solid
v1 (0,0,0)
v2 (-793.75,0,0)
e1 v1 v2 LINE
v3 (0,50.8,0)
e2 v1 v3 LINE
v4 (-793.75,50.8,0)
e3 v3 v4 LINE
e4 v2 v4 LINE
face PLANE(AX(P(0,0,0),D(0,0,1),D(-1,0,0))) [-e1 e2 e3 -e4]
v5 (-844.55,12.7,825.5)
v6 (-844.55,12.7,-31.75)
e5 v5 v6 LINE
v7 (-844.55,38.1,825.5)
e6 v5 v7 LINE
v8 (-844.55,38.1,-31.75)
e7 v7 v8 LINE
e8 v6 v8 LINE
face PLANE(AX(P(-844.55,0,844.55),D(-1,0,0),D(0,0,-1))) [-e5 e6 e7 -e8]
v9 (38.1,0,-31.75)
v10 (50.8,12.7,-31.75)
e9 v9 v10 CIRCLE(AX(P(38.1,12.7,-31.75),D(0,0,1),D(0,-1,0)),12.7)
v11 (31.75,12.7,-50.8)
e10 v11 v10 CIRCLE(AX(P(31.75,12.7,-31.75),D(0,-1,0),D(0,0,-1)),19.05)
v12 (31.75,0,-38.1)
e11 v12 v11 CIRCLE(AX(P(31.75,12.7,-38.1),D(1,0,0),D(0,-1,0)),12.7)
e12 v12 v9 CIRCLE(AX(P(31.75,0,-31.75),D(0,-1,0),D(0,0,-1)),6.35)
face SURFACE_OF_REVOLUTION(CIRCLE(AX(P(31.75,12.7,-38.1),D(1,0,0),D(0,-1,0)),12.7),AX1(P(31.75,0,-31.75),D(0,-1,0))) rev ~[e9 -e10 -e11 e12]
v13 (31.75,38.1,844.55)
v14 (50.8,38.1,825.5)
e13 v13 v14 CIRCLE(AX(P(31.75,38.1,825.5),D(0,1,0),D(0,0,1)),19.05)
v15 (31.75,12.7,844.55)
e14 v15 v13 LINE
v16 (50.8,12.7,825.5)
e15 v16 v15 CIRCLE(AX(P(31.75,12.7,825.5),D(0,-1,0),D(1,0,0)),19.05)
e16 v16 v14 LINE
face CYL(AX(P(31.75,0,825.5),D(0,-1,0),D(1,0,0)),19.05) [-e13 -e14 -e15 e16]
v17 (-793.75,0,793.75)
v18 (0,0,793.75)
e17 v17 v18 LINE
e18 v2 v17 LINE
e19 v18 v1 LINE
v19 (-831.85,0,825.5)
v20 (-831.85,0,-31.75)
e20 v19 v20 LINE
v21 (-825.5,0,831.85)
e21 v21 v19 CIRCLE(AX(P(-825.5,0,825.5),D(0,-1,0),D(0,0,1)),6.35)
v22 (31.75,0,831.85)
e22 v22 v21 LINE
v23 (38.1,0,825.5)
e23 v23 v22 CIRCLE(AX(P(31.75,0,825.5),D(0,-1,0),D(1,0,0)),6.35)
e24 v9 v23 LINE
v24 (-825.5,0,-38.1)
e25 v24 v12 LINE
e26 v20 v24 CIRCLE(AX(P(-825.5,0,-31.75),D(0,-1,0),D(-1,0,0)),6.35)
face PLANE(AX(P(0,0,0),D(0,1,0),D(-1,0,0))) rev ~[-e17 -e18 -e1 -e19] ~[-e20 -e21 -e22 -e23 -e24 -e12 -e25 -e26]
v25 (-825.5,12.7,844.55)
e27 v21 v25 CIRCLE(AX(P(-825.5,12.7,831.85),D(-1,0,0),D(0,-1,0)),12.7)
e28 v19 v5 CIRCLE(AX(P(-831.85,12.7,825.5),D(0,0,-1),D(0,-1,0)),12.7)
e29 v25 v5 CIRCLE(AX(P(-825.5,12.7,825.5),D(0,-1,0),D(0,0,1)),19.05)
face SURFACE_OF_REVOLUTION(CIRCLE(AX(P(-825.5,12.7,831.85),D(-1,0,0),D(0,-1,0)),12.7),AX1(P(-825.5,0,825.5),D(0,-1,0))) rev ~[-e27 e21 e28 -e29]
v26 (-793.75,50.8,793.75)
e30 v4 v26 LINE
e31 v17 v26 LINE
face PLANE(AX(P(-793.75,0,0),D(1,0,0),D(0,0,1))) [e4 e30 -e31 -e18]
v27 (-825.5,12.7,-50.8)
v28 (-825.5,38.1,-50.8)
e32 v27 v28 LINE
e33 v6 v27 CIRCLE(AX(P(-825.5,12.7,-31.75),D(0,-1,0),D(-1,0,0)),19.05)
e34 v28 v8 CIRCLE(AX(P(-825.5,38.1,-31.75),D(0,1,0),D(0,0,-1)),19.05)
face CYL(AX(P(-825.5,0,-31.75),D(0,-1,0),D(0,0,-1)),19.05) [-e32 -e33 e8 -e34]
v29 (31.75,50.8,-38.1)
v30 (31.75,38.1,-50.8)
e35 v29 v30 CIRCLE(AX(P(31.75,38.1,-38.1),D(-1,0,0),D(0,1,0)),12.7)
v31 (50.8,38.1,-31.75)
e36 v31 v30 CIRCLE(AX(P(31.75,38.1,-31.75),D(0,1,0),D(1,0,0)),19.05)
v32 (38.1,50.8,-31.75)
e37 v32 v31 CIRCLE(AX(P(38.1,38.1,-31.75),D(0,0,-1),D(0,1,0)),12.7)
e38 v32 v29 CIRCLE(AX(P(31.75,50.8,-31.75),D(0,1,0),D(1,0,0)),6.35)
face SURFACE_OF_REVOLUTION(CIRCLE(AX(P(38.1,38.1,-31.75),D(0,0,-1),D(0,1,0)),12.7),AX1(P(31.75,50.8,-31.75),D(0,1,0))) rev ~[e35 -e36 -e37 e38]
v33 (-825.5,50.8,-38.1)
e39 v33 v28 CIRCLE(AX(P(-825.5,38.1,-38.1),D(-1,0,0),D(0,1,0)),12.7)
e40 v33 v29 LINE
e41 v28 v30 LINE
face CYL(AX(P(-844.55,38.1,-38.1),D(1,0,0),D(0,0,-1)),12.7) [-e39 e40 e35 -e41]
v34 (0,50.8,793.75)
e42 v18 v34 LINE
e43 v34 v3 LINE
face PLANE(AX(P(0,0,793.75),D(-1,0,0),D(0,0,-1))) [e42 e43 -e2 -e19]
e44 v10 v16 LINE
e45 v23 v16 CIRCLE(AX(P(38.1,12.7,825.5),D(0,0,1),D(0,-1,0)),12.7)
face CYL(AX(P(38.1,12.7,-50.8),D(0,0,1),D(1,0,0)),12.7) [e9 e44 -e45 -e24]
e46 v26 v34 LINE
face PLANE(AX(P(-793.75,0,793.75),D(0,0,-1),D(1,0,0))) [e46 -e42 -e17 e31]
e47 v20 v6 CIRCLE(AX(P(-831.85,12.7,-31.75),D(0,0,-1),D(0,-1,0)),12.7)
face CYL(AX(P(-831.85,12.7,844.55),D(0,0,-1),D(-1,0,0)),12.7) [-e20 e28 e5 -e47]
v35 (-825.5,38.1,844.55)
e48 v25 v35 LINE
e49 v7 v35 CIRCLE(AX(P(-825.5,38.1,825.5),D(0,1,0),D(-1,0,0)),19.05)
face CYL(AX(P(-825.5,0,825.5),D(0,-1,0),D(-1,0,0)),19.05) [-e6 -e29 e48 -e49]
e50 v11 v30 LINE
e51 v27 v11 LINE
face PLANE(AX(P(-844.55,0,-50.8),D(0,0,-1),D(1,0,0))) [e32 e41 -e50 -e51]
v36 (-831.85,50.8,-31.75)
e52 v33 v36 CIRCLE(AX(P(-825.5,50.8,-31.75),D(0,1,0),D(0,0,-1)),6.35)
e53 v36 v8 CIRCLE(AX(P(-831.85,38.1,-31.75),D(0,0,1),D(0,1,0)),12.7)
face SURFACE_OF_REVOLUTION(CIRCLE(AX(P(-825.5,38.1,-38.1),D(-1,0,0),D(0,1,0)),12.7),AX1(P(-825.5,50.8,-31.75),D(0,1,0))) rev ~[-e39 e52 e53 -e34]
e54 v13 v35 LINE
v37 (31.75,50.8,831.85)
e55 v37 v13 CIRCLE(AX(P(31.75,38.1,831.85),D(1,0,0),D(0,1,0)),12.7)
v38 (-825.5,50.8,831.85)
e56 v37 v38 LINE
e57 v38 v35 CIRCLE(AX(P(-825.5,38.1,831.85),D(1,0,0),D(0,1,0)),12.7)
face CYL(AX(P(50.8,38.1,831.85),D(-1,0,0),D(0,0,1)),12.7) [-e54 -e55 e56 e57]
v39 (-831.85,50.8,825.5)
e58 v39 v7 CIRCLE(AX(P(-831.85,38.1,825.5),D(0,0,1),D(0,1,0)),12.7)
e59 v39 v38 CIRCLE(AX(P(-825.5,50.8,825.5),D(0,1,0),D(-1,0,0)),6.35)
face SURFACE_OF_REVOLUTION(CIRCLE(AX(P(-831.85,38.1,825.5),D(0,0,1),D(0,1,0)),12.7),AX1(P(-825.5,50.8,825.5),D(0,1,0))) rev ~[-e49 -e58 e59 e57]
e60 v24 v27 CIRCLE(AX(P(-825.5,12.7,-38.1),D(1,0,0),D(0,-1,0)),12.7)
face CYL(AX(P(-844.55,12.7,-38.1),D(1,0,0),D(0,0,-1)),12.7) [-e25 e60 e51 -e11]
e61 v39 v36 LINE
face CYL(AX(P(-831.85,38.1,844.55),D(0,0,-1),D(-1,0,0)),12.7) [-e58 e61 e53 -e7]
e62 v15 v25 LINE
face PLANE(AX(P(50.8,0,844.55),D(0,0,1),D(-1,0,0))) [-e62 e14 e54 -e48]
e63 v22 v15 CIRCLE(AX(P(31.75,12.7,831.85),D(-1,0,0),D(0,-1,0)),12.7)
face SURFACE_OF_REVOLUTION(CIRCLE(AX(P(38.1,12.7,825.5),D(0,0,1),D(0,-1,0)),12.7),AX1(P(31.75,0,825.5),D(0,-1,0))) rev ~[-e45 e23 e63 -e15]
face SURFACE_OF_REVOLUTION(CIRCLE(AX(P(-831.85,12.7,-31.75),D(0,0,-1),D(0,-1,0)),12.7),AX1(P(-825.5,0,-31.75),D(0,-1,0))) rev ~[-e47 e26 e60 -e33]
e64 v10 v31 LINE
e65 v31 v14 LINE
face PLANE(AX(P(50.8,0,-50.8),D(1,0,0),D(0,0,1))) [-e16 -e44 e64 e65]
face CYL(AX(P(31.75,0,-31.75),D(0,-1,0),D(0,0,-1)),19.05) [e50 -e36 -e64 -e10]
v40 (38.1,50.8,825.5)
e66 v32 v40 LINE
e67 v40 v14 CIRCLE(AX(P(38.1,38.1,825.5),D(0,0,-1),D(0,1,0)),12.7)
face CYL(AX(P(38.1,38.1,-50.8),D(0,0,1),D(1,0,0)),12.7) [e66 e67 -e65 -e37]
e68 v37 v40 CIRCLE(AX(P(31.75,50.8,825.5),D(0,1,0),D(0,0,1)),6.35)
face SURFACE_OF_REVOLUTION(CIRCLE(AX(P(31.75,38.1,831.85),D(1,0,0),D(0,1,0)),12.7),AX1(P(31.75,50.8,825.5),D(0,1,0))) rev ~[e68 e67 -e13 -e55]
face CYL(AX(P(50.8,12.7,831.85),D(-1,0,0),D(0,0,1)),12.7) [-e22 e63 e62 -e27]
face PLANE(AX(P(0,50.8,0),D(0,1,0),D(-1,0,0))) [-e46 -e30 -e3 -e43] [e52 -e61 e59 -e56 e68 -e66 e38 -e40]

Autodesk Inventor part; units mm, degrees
ref_plane "YZ Plane" through (0, 0, 0) normal (1, 0, 0) x (0, 1, 0)
ref_plane "XZ Plane" through (0, 0, 0) normal (0, 1, 0) x (-1, 0, 0)
ref_plane "XY Plane" through (0, 0, 0) normal (0, 0, 1) x (1, 0, 0)
sketch "Sketch1" plane through (0, 0, 0) normal (0, 1, 0) x (-1, 0, 0)
  line L0 (0, 0) -> (793.75, 0)
  line L1 (793.75, 0) -> (793.75, 793.75)
  line L2 (793.75, 793.75) -> (0, 793.75)
  line L3 (0, 793.75) -> (0, 0)
  line L4 (0, 793.75) -> (793.75, 0) construction
  line L5 (793.75, 793.75) -> (0, 0) construction
  line L6 (844.55, -50.8) -> (-50.8, -50.8)
  line L7 (-50.8, -50.8) -> (-50.8, 844.55)
  line L8 (-50.8, 844.55) -> (844.55, 844.55)
  line L9 (844.55, 844.55) -> (844.55, -50.8)
  line L10 (844.55, -50.8) -> (-50.8, 844.55) construction
  line L11 (-50.8, -50.8) -> (844.55, 844.55) construction
  point P0 (396.875, 396.875)
  dimension "d0" = 793.75
  dimension "d1" = 50.8
  dimension "d2" = 50.8
extrude "Extrusion1" add sketch "Sketch1" along normal blind 50.8
fillet "Fillet1" radius 12.7 8 edges at (-396.875, 50.8, 844.55) (-844.55, 50.8, 396.875) (-396.875, 50.8, -50.8) (50.8, 50.8, 396.875) (-396.875, 0, 844.55) (50.8, 0, 396.875) (-396.875, 0, -50.8) (-844.55, 0, 396.875)
fillet "Fillet2" radius 19.05 12 edges at (47.0803, 47.0803, -47.0803) (47.0803, 3.7197, -47.0803) (50.8, 25.4, -50.8) (47.0803, 47.0803, 840.8303) (47.0803, 3.7197, 840.8303) (50.8, 25.4, 844.55) (-840.8303, 47.0803, 840.8303) (-840.8303, 3.7197, 840.8303) (-844.55, 25.4, 844.55) (-840.8303, 47.0803, -47.0803) (-840.8303, 3.7197, -47.0803) (-844.55, 25.4, -50.8)
properties part number "200555"
